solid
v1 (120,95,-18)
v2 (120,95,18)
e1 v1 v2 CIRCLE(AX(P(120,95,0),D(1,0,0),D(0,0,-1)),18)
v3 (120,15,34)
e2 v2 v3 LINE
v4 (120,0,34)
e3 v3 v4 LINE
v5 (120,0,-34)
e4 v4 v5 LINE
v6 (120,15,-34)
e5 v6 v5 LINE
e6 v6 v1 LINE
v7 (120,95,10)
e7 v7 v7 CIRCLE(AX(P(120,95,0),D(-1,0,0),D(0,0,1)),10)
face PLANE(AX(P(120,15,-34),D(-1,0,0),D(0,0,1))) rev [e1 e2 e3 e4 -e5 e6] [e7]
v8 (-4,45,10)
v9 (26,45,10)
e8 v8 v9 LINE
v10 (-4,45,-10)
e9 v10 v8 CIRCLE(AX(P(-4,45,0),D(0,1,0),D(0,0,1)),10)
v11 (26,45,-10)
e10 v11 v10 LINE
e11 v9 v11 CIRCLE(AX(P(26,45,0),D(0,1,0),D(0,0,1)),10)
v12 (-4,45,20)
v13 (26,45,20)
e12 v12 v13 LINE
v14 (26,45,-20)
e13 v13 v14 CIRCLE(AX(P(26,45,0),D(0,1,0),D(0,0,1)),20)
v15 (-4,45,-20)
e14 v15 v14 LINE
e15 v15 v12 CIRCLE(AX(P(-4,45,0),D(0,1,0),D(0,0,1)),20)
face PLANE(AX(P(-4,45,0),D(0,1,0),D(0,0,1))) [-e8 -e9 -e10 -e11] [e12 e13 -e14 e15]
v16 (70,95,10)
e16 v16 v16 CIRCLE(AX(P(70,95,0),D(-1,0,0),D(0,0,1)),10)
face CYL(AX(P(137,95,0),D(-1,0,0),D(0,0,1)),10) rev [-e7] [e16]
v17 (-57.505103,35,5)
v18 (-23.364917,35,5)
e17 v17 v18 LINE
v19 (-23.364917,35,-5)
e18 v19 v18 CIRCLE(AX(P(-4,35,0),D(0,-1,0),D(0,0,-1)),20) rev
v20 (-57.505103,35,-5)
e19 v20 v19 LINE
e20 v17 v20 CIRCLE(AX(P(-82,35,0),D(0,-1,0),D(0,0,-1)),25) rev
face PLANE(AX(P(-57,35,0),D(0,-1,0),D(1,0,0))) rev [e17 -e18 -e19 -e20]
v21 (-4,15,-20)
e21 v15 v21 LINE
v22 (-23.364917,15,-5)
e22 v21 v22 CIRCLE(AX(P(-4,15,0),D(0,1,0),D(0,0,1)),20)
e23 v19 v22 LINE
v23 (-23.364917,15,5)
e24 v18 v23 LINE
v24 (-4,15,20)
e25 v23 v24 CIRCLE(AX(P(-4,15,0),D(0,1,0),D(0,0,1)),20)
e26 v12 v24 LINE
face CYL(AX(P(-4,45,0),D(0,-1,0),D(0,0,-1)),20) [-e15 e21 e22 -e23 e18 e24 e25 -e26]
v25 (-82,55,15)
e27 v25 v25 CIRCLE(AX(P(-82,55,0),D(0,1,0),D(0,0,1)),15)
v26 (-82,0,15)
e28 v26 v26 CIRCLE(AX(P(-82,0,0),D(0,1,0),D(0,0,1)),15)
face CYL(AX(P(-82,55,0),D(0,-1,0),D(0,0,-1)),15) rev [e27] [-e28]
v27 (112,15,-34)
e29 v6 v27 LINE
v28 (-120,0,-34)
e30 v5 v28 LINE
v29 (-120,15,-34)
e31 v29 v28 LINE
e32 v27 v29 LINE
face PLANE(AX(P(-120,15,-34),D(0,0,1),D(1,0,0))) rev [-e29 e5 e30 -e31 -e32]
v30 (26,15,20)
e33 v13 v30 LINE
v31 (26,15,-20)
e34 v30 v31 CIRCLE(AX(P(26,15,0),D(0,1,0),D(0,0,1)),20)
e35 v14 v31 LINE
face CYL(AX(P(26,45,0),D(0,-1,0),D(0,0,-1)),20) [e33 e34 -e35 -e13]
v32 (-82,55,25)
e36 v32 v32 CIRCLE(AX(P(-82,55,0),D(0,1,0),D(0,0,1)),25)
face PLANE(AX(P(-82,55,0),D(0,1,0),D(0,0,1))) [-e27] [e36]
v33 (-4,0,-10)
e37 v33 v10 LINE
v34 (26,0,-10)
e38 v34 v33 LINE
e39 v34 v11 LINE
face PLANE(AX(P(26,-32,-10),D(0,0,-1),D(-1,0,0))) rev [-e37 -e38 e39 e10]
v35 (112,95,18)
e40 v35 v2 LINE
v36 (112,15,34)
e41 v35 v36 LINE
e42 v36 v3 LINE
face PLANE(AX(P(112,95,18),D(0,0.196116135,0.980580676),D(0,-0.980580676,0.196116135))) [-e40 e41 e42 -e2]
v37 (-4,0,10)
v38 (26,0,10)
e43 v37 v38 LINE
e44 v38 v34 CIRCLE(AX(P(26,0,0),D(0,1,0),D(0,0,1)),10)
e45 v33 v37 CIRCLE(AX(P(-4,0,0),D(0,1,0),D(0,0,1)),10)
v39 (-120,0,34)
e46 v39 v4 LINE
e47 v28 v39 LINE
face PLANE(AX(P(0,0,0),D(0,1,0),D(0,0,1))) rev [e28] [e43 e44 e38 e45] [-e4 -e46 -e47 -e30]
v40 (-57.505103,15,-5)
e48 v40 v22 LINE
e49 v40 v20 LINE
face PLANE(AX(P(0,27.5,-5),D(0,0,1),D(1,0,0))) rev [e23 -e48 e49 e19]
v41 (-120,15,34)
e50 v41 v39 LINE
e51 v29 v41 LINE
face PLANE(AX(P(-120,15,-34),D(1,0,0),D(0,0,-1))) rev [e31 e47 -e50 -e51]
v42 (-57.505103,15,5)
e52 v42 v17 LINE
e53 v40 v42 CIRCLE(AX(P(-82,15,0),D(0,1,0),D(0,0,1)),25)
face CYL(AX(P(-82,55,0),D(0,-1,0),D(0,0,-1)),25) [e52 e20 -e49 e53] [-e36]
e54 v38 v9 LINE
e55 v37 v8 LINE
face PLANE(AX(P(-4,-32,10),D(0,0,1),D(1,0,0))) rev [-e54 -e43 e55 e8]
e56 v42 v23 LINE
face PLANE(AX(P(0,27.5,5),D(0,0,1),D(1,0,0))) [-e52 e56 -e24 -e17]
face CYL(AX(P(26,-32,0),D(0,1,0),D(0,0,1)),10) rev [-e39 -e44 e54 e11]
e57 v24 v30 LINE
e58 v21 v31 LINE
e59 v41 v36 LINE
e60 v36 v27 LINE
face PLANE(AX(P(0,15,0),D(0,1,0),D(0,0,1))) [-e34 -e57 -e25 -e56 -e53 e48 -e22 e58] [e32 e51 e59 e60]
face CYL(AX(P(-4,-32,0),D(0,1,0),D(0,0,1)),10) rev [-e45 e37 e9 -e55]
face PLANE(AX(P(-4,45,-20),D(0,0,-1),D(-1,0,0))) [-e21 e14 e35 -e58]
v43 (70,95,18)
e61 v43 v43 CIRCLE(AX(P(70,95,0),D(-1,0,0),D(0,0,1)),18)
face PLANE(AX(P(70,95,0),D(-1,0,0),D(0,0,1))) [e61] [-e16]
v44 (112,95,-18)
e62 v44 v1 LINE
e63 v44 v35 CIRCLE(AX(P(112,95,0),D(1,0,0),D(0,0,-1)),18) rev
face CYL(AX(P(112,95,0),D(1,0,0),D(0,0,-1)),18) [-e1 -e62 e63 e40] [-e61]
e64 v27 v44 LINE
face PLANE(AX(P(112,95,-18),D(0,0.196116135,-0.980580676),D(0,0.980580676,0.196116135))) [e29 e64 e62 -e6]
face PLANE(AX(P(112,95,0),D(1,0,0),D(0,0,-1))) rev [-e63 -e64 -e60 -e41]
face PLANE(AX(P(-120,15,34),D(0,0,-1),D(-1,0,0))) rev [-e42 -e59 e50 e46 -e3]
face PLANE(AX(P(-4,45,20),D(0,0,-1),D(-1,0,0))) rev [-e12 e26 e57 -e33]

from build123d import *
from build123d.topology import SkipClean

# Parameters (mm, degrees)
SKETCH2_W           = 240
SKETCH2_H           = 68
BOSS_EXTRUDE1_DEPTH = 15
SKETCH4_R           = 25
SKETCH4_R_2         = 15
BOSS_EXTRUDE4_DEPTH = 40
CUT_EXTRUDE2_START  = -40
SKETCH7_R           = 15
CUT_EXTRUDE2_DEPTH  = 40
BOSS_EXTRUDE5_DEPTH = 30
CUT_EXTRUDE3_DEPTH  = 77
RIB3_REACH          = 138.312
SKETCH11_WALL_W     = 307.624283584
SKETCH11_WALL_H     = 10
BOSS_EXTRUDE6_DEPTH = 8
SKETCH13_R          = 18
BOSS_EXTRUDE7_DEPTH = 42
SKETCH14_R          = 10
CUT_EXTRUDE4_DEPTH  = 67


with BuildPart() as part:
    # Sketch2 → Boss-Extrude1 (new body)
    with BuildSketch(Plane(origin=(0, 0, 0), x_dir=(1, 0, 0), z_dir=(0, 1, 0))):
        Rectangle(SKETCH2_W, SKETCH2_H)
    extrude(amount=BOSS_EXTRUDE1_DEPTH)

    # Sketch4 → Boss-Extrude4 (add)
    with BuildSketch(Plane(origin=(0, 15, 0), x_dir=(1, 0, 0), z_dir=(0, 1, 0))):
        with Locations((-82, 0)):
            Circle(SKETCH4_R)
        with Locations((-82, 0)):
            Circle(SKETCH4_R_2, mode=Mode.SUBTRACT)
    extrude(amount=BOSS_EXTRUDE4_DEPTH)

    # Sketch7 → Cut-Extrude2 (cut)
    with BuildSketch(Plane(origin=(0, 15, 0), x_dir=(1, 0, 0), z_dir=(0, 1, 0)).offset(CUT_EXTRUDE2_START)):
        with Locations((-82, 0)):
            Circle(SKETCH7_R)
    extrude(amount=CUT_EXTRUDE2_DEPTH, mode=Mode.SUBTRACT)

    # Sketch8 → Boss-Extrude5 (add)
    with BuildSketch(Plane(origin=(0, 15, 0), x_dir=(1, 0, 0), z_dir=(0, 1, 0))):
        with BuildLine():
            Line((-4, 20), (26, 20))
            ThreePointArc((26, 20), (46, 0), (26, -20))
            Line((26, -20), (-4, -20))
            ThreePointArc((-4, -20), (-24, 0), (-4, 20))
        make_face()
    extrude(amount=BOSS_EXTRUDE5_DEPTH)

    # Sketch9 → Cut-Extrude3 (cut)
    with BuildSketch(Plane(origin=(0, 45, 0), x_dir=(1, 0, 0), z_dir=(0, 1, 0))):
        with BuildLine():
            Line((-4, -10), (26, -10))
            ThreePointArc((26, -10), (36, 0), (26, 10))
            Line((26, 10), (-4, 10))
            ThreePointArc((-4, 10), (-14, 0), (-4, -10))
        make_face()
    extrude(amount=-CUT_EXTRUDE3_DEPTH, mode=Mode.SUBTRACT)

    # Sketch11 wall → Rib3 (add, up to next)
    with BuildSketch(Plane(origin=(-40.5, 35, 0), x_dir=(1, 0, 0), z_dir=(0, 1, 0)), mode=Mode.PRIVATE) as rib3_sk1:
        Rectangle(SKETCH11_WALL_W, SKETCH11_WALL_H)
    rib3_tool1 = extrude(rib3_sk1.sketch, amount=-RIB3_REACH, mode=Mode.PRIVATE) - part.part
    add(rib3_tool1.solids().sort_by_distance((-40.5, 35, 0))[0])

    # Sketch12 → Boss-Extrude6 (add)
    with BuildSketch(Plane(origin=(120, 0, 0), x_dir=(0, 0, -1), z_dir=(1, 0, 0))):
        with BuildLine():
            Line((-18, 95), (-34, 15))
            Line((-34, 15), (34, 15))
            Line((34, 15), (18, 95))
            ThreePointArc((18, 95), (0, 113), (-18, 95))
        make_face()
    extrude(amount=-BOSS_EXTRUDE6_DEPTH)

    # Sketch13 → Boss-Extrude7 (add)
    with SkipClean():  # the faces are left unmerged after this step: merging them gives an invalid solid
        with BuildSketch(Plane.ZY.offset(-112)):
            with Locations((0, 95)):
                Circle(SKETCH13_R)
        extrude(amount=BOSS_EXTRUDE7_DEPTH)
    add(part.part.scale(1), mode=Mode.REPLACE)  # the faces are merged on a copy

    # Sketch14 → Cut-Extrude4 (cut)
    with BuildSketch(Plane.ZY.offset(-70)):
        with Locations((0, 95)):
            Circle(SKETCH14_R)
    extrude(amount=-CUT_EXTRUDE4_DEPTH, mode=Mode.SUBTRACT)


solid = part.part
